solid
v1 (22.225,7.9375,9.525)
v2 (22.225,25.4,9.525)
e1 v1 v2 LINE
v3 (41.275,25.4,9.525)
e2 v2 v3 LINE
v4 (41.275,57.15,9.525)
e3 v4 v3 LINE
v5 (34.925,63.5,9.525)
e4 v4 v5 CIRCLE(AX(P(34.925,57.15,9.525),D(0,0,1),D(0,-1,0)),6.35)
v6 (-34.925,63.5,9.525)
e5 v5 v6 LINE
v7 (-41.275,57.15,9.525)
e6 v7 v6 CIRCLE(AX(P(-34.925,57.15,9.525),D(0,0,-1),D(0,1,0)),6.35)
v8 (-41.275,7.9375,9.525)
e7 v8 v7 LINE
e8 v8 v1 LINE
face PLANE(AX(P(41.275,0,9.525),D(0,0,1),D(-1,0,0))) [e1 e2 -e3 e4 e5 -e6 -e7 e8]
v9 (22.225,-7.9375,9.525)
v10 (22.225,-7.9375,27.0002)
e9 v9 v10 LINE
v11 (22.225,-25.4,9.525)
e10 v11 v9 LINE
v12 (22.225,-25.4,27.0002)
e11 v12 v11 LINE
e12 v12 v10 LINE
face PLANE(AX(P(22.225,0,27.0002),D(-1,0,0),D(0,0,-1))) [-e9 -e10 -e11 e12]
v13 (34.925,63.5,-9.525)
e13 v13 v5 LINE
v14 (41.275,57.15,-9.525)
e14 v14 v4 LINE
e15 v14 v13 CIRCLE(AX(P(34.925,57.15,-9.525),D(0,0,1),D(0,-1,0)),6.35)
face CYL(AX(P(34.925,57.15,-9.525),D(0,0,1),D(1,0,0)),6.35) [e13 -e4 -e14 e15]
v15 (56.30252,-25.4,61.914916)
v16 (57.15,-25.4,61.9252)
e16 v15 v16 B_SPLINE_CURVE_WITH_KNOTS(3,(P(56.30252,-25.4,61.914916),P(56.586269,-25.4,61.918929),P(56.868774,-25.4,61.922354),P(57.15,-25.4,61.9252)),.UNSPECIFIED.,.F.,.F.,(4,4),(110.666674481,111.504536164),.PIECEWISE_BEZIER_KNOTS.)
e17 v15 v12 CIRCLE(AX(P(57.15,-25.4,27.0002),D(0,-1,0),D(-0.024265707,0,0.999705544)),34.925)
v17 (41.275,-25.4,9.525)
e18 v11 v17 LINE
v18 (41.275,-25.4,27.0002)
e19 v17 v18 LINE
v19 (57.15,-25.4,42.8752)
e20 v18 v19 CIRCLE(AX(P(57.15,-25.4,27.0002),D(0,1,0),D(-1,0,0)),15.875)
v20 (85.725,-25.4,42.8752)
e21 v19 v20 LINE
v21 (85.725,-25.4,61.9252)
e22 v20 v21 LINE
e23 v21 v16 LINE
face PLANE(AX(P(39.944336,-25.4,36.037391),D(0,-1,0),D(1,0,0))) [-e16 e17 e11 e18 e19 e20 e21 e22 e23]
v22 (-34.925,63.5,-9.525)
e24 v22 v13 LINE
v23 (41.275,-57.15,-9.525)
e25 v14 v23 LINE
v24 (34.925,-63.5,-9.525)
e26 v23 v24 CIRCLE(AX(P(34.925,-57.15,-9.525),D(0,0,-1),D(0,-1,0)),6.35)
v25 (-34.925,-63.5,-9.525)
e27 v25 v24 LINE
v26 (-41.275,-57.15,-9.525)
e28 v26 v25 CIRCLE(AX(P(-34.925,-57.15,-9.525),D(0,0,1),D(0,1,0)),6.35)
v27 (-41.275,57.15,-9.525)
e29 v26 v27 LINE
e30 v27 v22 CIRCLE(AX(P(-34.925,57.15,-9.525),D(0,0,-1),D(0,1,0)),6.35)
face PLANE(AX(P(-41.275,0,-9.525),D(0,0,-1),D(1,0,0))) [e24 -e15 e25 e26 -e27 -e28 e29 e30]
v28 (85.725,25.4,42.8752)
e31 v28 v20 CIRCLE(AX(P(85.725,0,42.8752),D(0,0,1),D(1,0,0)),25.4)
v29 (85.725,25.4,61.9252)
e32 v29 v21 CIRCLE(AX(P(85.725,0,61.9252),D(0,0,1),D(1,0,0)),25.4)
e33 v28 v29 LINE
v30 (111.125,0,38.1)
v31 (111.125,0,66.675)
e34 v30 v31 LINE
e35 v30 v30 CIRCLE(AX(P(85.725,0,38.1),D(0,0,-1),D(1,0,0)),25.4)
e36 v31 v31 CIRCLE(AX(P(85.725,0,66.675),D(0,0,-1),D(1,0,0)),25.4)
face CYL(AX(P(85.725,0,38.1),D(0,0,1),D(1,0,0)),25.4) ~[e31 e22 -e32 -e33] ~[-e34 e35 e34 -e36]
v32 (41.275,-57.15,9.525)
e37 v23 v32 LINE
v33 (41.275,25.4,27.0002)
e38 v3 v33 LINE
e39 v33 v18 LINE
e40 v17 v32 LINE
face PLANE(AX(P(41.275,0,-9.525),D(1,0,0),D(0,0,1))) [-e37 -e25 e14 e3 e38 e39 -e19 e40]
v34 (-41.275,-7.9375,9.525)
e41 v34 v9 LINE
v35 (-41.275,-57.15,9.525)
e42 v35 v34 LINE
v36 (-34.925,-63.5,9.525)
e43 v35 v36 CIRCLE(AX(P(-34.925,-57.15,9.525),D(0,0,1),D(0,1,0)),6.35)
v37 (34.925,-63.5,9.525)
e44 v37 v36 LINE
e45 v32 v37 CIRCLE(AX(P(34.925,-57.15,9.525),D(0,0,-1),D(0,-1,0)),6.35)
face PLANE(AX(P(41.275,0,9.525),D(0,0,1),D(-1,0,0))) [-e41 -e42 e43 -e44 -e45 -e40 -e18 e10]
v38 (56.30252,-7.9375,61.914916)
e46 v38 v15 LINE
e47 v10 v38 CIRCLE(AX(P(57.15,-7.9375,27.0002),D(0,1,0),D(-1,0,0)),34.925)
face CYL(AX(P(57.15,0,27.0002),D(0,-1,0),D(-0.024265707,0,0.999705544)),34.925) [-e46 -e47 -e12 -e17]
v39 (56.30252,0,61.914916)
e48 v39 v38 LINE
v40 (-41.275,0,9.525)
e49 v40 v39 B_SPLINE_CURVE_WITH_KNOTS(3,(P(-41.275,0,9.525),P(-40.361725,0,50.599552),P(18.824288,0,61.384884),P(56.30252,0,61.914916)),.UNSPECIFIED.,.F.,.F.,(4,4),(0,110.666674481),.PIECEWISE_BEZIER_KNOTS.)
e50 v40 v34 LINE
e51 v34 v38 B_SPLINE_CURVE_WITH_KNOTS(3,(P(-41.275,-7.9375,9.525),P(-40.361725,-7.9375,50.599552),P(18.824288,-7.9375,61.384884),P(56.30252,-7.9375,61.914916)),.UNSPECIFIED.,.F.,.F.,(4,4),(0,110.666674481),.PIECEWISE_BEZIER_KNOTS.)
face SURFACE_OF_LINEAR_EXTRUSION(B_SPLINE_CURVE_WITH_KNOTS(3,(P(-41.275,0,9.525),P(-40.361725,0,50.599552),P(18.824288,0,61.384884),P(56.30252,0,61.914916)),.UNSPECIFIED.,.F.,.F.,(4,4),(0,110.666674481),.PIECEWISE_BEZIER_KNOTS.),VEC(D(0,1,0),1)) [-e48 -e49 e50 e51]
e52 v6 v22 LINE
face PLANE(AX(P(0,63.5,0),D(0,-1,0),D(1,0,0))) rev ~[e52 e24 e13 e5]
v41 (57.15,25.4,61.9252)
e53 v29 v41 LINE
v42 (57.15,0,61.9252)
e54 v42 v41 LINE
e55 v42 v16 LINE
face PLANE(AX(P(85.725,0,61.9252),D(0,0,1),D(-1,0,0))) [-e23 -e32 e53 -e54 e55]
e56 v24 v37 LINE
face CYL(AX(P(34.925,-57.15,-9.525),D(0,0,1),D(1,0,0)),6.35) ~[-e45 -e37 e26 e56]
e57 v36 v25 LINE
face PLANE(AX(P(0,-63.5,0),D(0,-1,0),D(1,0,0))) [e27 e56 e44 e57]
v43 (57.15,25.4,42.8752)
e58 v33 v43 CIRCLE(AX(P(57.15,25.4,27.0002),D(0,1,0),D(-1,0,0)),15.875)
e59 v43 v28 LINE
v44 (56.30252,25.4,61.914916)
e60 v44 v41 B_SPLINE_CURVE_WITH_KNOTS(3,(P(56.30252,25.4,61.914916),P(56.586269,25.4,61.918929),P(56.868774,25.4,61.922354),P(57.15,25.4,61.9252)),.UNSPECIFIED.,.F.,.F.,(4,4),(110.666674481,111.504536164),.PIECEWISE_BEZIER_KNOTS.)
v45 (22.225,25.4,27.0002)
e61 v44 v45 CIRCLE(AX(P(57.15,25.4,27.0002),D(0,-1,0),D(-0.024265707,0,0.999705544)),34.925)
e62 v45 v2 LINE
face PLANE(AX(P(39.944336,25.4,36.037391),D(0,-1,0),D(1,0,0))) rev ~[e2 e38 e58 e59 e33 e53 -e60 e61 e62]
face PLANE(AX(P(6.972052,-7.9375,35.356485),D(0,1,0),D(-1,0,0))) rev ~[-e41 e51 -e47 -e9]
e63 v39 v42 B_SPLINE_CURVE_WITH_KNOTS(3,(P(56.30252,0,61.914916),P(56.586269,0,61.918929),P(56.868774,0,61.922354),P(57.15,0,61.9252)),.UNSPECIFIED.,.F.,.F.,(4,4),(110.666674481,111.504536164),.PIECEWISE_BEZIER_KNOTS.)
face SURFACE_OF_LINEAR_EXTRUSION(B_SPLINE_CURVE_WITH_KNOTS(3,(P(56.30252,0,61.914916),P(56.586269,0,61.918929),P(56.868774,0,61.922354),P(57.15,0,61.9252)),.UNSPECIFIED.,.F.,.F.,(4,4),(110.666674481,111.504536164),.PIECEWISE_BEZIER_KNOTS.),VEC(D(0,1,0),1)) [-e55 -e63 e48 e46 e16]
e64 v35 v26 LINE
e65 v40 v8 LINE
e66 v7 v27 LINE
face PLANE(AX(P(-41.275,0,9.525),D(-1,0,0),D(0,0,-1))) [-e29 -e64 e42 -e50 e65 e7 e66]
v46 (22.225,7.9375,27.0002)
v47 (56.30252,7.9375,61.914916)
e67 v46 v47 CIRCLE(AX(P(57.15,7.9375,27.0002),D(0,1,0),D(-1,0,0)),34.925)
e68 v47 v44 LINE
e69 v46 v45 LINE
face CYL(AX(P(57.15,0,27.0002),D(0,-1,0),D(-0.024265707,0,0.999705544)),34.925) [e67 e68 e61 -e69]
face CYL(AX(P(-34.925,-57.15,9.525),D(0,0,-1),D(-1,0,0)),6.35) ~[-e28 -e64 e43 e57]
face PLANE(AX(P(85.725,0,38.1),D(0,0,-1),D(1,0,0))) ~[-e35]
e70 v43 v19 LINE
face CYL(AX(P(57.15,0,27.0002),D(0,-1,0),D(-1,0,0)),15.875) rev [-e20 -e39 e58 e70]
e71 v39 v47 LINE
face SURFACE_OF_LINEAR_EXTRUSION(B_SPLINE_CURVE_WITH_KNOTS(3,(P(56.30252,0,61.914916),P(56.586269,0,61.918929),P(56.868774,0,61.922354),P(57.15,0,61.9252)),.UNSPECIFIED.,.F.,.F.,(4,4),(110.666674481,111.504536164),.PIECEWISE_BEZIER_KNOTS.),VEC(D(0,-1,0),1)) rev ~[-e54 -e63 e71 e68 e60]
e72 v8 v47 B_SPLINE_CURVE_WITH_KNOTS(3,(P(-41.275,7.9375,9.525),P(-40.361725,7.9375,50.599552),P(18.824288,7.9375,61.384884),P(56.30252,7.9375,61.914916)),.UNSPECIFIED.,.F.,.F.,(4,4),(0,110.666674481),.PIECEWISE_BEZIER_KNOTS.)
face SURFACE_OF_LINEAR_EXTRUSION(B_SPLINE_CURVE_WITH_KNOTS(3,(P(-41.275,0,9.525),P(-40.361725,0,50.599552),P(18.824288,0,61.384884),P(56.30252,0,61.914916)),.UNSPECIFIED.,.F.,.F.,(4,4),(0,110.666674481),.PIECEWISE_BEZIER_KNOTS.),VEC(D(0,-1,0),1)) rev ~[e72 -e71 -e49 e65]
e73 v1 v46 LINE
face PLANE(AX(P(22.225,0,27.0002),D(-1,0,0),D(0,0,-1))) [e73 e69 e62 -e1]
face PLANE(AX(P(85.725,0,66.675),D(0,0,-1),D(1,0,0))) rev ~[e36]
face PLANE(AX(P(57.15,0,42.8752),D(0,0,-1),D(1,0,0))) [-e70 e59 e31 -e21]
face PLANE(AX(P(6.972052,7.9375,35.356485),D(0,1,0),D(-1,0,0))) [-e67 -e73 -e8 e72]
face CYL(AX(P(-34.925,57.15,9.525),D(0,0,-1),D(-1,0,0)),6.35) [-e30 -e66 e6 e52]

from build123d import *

# Parameters (mm, degrees)
F1_DEPTH = 63.5
F0_W     = 25.4
F0_H     = 19.05
F2_DEPTH = 25.4
F3_DEPTH = 7.9375
F5_R     = 6.35


# Not quite as in the source:
# - a feature names something its author has since deleted; it is built from what else it names


with BuildPart() as f1:
    # F0 (on Front) → F1 (new body, symmetric)
    with BuildSketch(Plane.XZ):
        Polygon((-41.275, -9.525), (41.275, -9.525), (41.275, 9.525), (22.225, 9.525), (-41.275, 9.525), align=None)
    extrude(amount=F1_DEPTH, both=True)

    # F0 (on Front) → F2 (join, symmetric)
    with BuildSketch(Plane.XZ):
        with BuildLine():
            Line((22.225, 9.525), (41.275, 9.525))
            Line((41.275, 9.525), (41.275, 27.0002))
            ThreePointArc((41.275, 27.0002), (45.9246798487, 38.2255201513), (57.15, 42.8752))
            Line((57.15, 42.8752), (60.325, 42.8752))
            Line((60.325, 42.8752), (60.325, 61.9252))
            Line((60.325, 61.9252), (57.15, 61.9252))
            add(Edge.make_bspline(
                [(56.3025201656, 61.914916137), (56.5862693172, 61.9189290335), (56.8687741652, 61.9223540897), (57.15, 61.9252)],
                knots=[110.666674481, 110.666674481, 110.666674481, 110.666674481, 111.5045361635, 111.5045361635, 111.5045361635, 111.5045361635], degree=3))
            ThreePointArc((56.3025201656, 61.914916137), (32.156462253, 51.3944348905), (22.225, 27.0002))
            Line((22.225, 27.0002), (22.225, 9.525))
        make_face()
        with Locations((73.025, 52.4002)):
            Rectangle(F0_W, F0_H)
    extrude(amount=F2_DEPTH, both=True)

    # F0 (on Front) → F3 (join, symmetric)
    with BuildSketch(Plane.XZ):
        with BuildLine():
            add(Edge.make_bspline(
                [(-41.275, 9.525), (-40.3617250948, 50.5995517259), (18.8242875965, 61.3848836588), (56.3025201656, 61.914916137)],
                knots=[0, 0, 0, 0, 110.666674481, 110.666674481, 110.666674481, 110.666674481], degree=3))
            Line((-41.275, 9.525), (22.225, 9.525))
            Line((22.225, 9.525), (22.225, 27.0002))
            ThreePointArc((22.225, 27.0002), (32.156462253, 51.3944348905), (56.3025201656, 61.914916137))
        make_face()
    extrude(amount=F3_DEPTH, both=True)

    # F0 (on Front) → F4 (revolve)
    with BuildSketch(Plane.XZ):
        Polygon((85.725, 61.9252), (85.725, 42.8752), (85.725, 38.1), (111.125, 38.1), (111.125, 66.675), (85.725, 66.675), align=None)
    revolve(axis=Axis((85.725, 0, 52.3875), (0, 0, -1)))

    # F5
    f5_edges = [f1.edges().sort_by_distance(p)[0] for p in [
        (-41.275, -63.5, 0),
        (41.275, -63.5, 0),
        (41.275, 63.5, 0),
        (-41.275, 63.5, 0),
    ]]
    fillet(f5_edges, radius=F5_R)


solid = f1.part
